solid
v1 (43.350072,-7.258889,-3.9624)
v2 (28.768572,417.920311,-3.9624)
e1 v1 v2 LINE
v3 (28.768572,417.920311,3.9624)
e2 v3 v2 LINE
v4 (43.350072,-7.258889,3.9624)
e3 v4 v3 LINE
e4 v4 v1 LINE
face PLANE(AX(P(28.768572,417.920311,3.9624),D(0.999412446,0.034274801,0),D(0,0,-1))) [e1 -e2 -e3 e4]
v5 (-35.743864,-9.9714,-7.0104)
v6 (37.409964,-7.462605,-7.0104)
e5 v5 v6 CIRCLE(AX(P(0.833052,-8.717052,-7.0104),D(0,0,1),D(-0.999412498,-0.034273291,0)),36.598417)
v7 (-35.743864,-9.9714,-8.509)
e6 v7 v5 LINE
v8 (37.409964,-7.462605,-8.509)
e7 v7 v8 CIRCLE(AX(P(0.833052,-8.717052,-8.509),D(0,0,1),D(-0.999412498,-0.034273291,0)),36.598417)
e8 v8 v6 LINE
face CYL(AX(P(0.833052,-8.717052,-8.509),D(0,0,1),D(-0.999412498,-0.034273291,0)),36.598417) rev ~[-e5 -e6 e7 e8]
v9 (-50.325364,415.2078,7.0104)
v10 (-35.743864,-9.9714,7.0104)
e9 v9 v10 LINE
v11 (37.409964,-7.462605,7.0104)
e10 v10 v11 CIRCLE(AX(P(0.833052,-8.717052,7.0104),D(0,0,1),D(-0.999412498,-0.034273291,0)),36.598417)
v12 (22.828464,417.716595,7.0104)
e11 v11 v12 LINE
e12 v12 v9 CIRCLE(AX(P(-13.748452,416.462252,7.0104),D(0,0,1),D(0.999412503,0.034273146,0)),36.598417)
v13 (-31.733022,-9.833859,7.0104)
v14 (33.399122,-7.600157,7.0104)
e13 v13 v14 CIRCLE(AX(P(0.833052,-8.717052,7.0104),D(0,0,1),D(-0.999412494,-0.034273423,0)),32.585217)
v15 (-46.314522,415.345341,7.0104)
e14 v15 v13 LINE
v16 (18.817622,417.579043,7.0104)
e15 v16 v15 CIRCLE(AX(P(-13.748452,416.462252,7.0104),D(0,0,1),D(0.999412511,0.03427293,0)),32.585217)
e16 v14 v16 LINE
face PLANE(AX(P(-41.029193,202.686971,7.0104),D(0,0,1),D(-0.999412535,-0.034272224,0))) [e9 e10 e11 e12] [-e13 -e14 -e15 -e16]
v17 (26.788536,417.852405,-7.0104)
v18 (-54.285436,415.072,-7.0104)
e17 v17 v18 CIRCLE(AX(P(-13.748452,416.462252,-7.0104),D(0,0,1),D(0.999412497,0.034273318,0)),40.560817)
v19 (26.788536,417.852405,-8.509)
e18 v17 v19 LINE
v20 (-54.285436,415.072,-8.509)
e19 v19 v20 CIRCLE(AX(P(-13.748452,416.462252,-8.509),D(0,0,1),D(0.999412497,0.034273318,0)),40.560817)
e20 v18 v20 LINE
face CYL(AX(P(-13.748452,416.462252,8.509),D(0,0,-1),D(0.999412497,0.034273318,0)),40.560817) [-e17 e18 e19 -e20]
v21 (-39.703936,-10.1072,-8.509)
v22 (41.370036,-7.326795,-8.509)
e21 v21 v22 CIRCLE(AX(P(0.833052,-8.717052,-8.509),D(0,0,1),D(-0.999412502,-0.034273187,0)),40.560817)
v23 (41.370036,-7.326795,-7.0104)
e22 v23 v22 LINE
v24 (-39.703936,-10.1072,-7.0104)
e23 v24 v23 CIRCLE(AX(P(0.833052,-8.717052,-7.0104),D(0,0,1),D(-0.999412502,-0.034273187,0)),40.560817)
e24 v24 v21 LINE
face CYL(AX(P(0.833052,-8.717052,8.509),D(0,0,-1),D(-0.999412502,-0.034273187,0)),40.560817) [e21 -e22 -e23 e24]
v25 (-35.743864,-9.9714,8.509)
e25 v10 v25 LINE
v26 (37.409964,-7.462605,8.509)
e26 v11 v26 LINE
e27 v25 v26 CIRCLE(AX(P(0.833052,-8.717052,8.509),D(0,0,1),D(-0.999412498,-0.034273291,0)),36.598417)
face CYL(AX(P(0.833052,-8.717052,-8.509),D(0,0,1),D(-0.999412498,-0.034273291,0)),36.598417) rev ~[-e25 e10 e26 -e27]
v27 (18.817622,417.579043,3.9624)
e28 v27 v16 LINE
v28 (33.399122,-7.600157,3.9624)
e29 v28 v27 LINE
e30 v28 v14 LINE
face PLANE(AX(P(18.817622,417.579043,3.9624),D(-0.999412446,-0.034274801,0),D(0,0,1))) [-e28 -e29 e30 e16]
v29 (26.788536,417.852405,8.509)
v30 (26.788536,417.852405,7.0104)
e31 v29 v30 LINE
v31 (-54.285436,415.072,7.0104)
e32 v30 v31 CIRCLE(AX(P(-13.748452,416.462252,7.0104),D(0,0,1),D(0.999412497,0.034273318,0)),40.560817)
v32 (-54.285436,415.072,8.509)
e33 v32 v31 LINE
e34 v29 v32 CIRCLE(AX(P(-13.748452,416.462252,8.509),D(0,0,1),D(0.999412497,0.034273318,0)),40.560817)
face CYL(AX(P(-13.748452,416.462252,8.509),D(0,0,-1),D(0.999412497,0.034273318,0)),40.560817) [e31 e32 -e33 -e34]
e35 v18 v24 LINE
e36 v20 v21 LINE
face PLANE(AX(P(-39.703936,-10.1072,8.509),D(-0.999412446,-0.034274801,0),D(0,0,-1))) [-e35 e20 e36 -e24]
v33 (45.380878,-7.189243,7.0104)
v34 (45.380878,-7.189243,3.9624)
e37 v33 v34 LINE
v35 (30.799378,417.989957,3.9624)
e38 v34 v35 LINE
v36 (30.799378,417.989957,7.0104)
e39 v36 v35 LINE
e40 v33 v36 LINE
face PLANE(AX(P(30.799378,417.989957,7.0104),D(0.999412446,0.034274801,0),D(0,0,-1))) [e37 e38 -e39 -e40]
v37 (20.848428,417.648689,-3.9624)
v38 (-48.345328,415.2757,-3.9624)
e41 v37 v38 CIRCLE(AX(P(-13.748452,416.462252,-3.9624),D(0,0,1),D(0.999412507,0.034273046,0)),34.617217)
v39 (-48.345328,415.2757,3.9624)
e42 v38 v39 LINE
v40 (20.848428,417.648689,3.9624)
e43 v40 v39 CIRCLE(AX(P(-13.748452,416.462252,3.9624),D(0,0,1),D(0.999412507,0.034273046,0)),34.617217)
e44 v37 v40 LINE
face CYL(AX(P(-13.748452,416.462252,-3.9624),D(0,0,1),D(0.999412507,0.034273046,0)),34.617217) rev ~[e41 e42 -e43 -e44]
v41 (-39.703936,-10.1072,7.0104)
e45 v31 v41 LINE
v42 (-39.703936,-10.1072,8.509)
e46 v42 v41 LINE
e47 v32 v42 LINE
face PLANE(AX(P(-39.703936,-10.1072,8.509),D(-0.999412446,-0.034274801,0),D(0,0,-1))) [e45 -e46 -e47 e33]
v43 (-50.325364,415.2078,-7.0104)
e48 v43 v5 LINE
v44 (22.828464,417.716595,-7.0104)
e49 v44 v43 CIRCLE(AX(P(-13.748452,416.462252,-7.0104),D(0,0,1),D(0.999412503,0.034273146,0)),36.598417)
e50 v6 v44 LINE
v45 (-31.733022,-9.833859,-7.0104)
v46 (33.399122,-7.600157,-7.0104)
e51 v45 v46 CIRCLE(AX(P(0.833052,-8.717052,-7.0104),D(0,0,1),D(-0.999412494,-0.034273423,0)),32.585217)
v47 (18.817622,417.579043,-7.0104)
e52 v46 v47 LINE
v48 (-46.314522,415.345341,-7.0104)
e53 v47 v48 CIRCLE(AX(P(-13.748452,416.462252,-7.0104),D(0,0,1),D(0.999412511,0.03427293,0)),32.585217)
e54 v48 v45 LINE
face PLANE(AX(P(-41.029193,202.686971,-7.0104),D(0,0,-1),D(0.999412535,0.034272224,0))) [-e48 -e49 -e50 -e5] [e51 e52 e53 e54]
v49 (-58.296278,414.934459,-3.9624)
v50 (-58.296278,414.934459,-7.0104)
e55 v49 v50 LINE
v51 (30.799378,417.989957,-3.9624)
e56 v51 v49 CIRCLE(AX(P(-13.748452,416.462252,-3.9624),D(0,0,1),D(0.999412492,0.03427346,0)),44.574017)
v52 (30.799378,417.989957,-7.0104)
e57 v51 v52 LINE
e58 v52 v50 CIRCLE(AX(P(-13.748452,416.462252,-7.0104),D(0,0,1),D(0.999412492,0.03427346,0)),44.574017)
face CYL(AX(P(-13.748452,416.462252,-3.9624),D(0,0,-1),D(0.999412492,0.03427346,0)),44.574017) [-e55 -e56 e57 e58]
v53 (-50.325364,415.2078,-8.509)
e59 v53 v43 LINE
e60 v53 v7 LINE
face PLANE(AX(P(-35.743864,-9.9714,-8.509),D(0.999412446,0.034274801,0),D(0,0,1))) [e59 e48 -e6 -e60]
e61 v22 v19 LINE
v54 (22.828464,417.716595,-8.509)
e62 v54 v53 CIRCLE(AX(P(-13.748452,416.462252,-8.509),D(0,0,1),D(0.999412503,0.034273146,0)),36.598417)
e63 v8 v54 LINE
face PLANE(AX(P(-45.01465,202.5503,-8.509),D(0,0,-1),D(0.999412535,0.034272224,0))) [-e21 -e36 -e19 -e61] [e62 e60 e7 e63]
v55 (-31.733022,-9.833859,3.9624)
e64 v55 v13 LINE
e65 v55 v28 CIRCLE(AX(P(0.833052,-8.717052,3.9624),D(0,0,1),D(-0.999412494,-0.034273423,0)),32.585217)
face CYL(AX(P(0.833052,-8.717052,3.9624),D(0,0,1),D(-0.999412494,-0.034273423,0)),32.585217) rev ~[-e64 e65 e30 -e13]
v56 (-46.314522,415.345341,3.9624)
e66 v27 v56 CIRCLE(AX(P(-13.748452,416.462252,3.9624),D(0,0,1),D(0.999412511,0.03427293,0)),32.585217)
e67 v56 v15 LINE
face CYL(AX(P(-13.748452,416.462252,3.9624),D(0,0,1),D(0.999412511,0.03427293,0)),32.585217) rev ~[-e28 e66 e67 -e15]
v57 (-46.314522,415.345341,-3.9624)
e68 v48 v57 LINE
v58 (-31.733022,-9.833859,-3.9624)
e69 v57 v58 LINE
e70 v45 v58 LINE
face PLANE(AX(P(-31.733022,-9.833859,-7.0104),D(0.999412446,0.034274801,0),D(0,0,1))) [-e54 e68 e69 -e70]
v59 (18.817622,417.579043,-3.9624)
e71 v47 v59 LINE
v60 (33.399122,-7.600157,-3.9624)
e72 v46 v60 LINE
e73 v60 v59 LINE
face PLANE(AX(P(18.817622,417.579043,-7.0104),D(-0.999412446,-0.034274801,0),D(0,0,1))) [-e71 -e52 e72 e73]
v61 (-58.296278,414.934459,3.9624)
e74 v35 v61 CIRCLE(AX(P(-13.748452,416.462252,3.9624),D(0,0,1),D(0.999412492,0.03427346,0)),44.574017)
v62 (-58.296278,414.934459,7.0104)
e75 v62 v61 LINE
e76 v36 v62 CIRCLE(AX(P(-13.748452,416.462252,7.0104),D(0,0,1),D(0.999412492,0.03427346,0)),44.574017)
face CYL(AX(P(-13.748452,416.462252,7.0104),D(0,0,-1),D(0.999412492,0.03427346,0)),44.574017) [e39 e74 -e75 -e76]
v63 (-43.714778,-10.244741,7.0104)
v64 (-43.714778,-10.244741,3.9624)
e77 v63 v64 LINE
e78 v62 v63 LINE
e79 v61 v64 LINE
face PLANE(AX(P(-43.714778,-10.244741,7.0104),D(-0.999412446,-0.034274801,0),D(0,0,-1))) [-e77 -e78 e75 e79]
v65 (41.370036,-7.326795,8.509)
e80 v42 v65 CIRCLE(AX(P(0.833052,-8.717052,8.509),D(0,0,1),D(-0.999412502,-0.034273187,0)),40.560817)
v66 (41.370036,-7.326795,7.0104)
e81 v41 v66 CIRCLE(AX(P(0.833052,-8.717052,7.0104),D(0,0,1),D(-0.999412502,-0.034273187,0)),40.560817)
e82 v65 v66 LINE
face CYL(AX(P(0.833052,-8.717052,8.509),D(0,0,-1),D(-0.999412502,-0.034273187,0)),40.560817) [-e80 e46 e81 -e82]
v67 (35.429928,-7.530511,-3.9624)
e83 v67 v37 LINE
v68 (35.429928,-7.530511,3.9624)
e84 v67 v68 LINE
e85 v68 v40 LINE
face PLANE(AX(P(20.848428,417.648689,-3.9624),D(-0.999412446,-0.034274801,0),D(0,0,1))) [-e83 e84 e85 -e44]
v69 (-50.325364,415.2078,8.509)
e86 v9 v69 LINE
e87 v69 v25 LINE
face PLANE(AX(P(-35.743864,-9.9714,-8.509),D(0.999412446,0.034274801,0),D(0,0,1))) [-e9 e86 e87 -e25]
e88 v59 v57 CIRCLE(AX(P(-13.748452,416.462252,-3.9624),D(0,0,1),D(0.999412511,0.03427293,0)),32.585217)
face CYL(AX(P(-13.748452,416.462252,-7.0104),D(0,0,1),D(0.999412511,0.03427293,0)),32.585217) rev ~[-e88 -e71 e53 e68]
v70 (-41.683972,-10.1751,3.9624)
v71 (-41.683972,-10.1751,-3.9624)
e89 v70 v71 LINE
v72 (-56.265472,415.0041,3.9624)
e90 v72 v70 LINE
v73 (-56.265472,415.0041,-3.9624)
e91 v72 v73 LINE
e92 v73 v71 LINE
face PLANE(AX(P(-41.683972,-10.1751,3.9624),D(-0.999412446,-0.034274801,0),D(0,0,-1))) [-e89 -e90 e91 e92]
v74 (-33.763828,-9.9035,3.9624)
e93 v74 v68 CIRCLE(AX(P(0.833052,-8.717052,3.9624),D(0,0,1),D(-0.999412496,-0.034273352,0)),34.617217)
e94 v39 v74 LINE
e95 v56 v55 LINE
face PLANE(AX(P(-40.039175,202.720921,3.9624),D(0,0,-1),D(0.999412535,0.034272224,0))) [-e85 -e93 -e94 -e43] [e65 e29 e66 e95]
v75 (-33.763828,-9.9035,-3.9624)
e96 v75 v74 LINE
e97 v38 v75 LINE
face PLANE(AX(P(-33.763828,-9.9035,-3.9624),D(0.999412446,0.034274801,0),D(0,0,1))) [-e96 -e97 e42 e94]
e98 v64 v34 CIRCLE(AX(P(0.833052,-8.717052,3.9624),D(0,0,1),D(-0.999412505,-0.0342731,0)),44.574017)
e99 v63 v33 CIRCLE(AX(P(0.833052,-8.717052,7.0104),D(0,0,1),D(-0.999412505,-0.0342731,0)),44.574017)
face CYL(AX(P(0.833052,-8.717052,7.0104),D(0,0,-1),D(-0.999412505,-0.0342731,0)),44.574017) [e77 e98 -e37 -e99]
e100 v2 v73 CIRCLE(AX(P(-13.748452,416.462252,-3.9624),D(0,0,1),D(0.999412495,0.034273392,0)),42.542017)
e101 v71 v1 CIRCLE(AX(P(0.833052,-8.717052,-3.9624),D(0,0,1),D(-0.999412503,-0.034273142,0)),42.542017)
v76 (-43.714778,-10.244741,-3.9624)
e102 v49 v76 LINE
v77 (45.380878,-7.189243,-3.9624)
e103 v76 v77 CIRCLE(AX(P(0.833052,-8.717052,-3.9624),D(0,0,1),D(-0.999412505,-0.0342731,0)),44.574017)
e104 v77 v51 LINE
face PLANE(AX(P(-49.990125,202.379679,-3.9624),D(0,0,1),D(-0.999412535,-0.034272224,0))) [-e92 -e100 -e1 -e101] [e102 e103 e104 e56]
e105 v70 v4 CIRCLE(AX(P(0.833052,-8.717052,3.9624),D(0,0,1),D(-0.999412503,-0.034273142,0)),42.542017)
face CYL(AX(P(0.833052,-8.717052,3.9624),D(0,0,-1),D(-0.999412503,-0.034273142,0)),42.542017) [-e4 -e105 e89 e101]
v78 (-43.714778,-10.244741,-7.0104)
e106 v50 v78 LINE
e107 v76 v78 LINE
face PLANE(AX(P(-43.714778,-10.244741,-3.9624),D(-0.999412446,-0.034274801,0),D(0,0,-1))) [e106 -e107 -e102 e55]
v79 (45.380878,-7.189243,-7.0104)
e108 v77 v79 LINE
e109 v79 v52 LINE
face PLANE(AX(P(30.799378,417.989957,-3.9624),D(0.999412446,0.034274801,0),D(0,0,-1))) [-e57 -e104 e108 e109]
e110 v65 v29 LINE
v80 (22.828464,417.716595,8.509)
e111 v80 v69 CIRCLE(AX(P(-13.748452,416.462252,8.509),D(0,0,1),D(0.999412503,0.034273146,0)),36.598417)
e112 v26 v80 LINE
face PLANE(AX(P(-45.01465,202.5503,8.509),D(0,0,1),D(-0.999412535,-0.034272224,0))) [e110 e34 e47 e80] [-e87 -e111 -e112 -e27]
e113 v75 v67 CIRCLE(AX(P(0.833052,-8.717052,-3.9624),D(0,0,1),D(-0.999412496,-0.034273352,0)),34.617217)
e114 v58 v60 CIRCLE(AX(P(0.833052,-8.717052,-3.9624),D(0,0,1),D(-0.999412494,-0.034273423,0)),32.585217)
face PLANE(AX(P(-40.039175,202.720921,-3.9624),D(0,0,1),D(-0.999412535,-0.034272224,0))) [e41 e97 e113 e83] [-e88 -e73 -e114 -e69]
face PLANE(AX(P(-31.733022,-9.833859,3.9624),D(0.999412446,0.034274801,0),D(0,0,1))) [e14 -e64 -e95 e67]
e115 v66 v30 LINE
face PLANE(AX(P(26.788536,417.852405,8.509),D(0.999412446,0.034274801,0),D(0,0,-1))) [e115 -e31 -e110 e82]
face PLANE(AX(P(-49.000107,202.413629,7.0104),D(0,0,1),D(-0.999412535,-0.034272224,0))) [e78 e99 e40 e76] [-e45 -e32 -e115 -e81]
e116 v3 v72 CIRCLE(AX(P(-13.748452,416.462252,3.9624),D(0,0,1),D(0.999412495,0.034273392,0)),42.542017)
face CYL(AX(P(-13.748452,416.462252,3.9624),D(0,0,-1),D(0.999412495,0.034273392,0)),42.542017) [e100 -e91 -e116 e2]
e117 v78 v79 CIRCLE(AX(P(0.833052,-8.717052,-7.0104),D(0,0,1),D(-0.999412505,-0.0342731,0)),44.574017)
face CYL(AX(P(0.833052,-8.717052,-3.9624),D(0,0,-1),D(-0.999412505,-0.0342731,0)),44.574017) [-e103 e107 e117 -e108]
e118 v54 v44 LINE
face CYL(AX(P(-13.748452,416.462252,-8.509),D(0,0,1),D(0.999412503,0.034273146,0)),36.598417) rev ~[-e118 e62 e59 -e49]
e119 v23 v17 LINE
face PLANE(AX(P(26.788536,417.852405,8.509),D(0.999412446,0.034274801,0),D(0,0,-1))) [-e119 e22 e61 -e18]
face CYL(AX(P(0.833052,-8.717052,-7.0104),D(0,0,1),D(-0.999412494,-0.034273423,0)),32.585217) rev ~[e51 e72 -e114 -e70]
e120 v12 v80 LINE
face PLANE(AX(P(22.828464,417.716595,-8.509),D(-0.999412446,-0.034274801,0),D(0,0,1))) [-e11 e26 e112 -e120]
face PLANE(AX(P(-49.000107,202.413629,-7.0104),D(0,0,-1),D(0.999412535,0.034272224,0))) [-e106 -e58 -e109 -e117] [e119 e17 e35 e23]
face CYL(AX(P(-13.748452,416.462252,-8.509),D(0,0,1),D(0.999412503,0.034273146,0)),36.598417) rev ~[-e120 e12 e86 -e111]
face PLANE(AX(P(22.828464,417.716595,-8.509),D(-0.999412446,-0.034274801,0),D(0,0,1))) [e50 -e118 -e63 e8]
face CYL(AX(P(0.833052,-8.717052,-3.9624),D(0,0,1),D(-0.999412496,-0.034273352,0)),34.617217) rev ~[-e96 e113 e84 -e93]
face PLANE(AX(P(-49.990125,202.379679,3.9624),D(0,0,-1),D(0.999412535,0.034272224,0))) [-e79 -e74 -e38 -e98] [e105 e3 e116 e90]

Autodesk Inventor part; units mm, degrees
ref_plane "Work Plane2" through (0.8331, -8.717, 0) normal (-1, 0, 0) x (0, 0, 1)
ref_plane "Work Plane3" through (-13.7485, 416.4622, 0) normal (-0.0825793, -0.9965845, 0) x (0, 0, 1)
sketch "Path" plane through (0, 0, 0) normal (0, 0, 1) x (1, 0, 0)
  arc A0 (-37.7239, -10.0393) -> (39.39, -7.3947) centre (0.8331, -8.717) ccw
  arc A1 (24.8085, 417.7845) -> (-52.3054, 415.1399) centre (-13.7485, 416.4622) ccw
  line L0 (24.8085, 417.7845) -> (39.39, -7.3947)
  line L1 (-37.7239, -10.0393) -> (-52.3054, 415.1399)
  dimension "d31" = 11.9888
ref_plane "Section Plane" through (39.39, -7.3947, 0) normal (-0.0342749, 0.9994124, 0) x (0, 0, 1)
sketch "Section Sketch" plane through (39.39, -7.3947, 0) normal (-0.0342749, 0.9994124, 0) x (0, 0, 1)
  line L0 (-8.509, -1.9812) -> (8.509, -1.9812)
  line L1 (8.509, -1.9812) -> (8.509, 1.9812)
  line L2 (8.509, 1.9812) -> (-8.509, 1.9812)
  line L3 (-8.509, 1.9812) -> (-8.509, -1.9812)
  line L4 (-3.9624, -3.9624) -> (3.9624, -3.9624)
  line L5 (3.9624, -3.9624) -> (3.9624, 3.9624)
  line L6 (3.9624, 3.9624) -> (-3.9624, 3.9624)
  line L7 (-3.9624, 3.9624) -> (-3.9624, -3.9624)
  line L8 (-3.9624, 0) -> (3.9624, 0) construction
  line L9 (-7.0104, -5.9944) -> (-3.9624, -5.9944)
  line L10 (-3.9624, -5.9944) -> (-3.9624, 5.9944)
  line L11 (-3.9624, 5.9944) -> (-7.0104, 5.9944)
  line L12 (-7.0104, 5.9944) -> (-7.0104, -5.9944)
  line L13 (3.9624, -5.9944) -> (7.0104, -5.9944)
  line L14 (7.0104, -5.9944) -> (7.0104, 5.9944)
  line L15 (7.0104, 5.9944) -> (3.9624, 5.9944)
  line L16 (3.9624, 5.9944) -> (3.9624, -5.9944)
  line L17 (-8.509, 0) -> (8.509, 0) construction
  point P0 (0, 0)
  point P1 (0, 0)
  dimension "d21" = 3.9624
  dimension "d22" = 7.9248
  dimension "d23" = 7.9248
  dimension "d24" = 3.048
  dimension "d31" = 11.9888
  dimension "d32" = 17.018
sweep "Solid" add profiles "Section Sketch" path "Path"
pattern_of_one "Strand Pattern"
equation "\"d21\" = da_d2"
equation "\"d22\" = da_d1"
equation "\"d23\" = da_b1"
equation "\"d24\" = da_t1 + da_t2"
equation "\"d30\" = da_pt"
equation "\"da_p\" = 12.7"
equation "\"da_b1\" = 7.9248"
equation "\"da_h2\" = 11.9888"
equation "\"da_h3\" = 10.3886"
equation "\"da_d1\" = 7.9248"
equation "\"da_d2\" = 3.9624"
equation "\"da_pt\" = 14.3764"
equation "\"da_b\" = 17.018"
equation "\"da_t1\" = 1.524"
equation "\"da_t2\" = 1.524"
properties part number "Roller Chain"
